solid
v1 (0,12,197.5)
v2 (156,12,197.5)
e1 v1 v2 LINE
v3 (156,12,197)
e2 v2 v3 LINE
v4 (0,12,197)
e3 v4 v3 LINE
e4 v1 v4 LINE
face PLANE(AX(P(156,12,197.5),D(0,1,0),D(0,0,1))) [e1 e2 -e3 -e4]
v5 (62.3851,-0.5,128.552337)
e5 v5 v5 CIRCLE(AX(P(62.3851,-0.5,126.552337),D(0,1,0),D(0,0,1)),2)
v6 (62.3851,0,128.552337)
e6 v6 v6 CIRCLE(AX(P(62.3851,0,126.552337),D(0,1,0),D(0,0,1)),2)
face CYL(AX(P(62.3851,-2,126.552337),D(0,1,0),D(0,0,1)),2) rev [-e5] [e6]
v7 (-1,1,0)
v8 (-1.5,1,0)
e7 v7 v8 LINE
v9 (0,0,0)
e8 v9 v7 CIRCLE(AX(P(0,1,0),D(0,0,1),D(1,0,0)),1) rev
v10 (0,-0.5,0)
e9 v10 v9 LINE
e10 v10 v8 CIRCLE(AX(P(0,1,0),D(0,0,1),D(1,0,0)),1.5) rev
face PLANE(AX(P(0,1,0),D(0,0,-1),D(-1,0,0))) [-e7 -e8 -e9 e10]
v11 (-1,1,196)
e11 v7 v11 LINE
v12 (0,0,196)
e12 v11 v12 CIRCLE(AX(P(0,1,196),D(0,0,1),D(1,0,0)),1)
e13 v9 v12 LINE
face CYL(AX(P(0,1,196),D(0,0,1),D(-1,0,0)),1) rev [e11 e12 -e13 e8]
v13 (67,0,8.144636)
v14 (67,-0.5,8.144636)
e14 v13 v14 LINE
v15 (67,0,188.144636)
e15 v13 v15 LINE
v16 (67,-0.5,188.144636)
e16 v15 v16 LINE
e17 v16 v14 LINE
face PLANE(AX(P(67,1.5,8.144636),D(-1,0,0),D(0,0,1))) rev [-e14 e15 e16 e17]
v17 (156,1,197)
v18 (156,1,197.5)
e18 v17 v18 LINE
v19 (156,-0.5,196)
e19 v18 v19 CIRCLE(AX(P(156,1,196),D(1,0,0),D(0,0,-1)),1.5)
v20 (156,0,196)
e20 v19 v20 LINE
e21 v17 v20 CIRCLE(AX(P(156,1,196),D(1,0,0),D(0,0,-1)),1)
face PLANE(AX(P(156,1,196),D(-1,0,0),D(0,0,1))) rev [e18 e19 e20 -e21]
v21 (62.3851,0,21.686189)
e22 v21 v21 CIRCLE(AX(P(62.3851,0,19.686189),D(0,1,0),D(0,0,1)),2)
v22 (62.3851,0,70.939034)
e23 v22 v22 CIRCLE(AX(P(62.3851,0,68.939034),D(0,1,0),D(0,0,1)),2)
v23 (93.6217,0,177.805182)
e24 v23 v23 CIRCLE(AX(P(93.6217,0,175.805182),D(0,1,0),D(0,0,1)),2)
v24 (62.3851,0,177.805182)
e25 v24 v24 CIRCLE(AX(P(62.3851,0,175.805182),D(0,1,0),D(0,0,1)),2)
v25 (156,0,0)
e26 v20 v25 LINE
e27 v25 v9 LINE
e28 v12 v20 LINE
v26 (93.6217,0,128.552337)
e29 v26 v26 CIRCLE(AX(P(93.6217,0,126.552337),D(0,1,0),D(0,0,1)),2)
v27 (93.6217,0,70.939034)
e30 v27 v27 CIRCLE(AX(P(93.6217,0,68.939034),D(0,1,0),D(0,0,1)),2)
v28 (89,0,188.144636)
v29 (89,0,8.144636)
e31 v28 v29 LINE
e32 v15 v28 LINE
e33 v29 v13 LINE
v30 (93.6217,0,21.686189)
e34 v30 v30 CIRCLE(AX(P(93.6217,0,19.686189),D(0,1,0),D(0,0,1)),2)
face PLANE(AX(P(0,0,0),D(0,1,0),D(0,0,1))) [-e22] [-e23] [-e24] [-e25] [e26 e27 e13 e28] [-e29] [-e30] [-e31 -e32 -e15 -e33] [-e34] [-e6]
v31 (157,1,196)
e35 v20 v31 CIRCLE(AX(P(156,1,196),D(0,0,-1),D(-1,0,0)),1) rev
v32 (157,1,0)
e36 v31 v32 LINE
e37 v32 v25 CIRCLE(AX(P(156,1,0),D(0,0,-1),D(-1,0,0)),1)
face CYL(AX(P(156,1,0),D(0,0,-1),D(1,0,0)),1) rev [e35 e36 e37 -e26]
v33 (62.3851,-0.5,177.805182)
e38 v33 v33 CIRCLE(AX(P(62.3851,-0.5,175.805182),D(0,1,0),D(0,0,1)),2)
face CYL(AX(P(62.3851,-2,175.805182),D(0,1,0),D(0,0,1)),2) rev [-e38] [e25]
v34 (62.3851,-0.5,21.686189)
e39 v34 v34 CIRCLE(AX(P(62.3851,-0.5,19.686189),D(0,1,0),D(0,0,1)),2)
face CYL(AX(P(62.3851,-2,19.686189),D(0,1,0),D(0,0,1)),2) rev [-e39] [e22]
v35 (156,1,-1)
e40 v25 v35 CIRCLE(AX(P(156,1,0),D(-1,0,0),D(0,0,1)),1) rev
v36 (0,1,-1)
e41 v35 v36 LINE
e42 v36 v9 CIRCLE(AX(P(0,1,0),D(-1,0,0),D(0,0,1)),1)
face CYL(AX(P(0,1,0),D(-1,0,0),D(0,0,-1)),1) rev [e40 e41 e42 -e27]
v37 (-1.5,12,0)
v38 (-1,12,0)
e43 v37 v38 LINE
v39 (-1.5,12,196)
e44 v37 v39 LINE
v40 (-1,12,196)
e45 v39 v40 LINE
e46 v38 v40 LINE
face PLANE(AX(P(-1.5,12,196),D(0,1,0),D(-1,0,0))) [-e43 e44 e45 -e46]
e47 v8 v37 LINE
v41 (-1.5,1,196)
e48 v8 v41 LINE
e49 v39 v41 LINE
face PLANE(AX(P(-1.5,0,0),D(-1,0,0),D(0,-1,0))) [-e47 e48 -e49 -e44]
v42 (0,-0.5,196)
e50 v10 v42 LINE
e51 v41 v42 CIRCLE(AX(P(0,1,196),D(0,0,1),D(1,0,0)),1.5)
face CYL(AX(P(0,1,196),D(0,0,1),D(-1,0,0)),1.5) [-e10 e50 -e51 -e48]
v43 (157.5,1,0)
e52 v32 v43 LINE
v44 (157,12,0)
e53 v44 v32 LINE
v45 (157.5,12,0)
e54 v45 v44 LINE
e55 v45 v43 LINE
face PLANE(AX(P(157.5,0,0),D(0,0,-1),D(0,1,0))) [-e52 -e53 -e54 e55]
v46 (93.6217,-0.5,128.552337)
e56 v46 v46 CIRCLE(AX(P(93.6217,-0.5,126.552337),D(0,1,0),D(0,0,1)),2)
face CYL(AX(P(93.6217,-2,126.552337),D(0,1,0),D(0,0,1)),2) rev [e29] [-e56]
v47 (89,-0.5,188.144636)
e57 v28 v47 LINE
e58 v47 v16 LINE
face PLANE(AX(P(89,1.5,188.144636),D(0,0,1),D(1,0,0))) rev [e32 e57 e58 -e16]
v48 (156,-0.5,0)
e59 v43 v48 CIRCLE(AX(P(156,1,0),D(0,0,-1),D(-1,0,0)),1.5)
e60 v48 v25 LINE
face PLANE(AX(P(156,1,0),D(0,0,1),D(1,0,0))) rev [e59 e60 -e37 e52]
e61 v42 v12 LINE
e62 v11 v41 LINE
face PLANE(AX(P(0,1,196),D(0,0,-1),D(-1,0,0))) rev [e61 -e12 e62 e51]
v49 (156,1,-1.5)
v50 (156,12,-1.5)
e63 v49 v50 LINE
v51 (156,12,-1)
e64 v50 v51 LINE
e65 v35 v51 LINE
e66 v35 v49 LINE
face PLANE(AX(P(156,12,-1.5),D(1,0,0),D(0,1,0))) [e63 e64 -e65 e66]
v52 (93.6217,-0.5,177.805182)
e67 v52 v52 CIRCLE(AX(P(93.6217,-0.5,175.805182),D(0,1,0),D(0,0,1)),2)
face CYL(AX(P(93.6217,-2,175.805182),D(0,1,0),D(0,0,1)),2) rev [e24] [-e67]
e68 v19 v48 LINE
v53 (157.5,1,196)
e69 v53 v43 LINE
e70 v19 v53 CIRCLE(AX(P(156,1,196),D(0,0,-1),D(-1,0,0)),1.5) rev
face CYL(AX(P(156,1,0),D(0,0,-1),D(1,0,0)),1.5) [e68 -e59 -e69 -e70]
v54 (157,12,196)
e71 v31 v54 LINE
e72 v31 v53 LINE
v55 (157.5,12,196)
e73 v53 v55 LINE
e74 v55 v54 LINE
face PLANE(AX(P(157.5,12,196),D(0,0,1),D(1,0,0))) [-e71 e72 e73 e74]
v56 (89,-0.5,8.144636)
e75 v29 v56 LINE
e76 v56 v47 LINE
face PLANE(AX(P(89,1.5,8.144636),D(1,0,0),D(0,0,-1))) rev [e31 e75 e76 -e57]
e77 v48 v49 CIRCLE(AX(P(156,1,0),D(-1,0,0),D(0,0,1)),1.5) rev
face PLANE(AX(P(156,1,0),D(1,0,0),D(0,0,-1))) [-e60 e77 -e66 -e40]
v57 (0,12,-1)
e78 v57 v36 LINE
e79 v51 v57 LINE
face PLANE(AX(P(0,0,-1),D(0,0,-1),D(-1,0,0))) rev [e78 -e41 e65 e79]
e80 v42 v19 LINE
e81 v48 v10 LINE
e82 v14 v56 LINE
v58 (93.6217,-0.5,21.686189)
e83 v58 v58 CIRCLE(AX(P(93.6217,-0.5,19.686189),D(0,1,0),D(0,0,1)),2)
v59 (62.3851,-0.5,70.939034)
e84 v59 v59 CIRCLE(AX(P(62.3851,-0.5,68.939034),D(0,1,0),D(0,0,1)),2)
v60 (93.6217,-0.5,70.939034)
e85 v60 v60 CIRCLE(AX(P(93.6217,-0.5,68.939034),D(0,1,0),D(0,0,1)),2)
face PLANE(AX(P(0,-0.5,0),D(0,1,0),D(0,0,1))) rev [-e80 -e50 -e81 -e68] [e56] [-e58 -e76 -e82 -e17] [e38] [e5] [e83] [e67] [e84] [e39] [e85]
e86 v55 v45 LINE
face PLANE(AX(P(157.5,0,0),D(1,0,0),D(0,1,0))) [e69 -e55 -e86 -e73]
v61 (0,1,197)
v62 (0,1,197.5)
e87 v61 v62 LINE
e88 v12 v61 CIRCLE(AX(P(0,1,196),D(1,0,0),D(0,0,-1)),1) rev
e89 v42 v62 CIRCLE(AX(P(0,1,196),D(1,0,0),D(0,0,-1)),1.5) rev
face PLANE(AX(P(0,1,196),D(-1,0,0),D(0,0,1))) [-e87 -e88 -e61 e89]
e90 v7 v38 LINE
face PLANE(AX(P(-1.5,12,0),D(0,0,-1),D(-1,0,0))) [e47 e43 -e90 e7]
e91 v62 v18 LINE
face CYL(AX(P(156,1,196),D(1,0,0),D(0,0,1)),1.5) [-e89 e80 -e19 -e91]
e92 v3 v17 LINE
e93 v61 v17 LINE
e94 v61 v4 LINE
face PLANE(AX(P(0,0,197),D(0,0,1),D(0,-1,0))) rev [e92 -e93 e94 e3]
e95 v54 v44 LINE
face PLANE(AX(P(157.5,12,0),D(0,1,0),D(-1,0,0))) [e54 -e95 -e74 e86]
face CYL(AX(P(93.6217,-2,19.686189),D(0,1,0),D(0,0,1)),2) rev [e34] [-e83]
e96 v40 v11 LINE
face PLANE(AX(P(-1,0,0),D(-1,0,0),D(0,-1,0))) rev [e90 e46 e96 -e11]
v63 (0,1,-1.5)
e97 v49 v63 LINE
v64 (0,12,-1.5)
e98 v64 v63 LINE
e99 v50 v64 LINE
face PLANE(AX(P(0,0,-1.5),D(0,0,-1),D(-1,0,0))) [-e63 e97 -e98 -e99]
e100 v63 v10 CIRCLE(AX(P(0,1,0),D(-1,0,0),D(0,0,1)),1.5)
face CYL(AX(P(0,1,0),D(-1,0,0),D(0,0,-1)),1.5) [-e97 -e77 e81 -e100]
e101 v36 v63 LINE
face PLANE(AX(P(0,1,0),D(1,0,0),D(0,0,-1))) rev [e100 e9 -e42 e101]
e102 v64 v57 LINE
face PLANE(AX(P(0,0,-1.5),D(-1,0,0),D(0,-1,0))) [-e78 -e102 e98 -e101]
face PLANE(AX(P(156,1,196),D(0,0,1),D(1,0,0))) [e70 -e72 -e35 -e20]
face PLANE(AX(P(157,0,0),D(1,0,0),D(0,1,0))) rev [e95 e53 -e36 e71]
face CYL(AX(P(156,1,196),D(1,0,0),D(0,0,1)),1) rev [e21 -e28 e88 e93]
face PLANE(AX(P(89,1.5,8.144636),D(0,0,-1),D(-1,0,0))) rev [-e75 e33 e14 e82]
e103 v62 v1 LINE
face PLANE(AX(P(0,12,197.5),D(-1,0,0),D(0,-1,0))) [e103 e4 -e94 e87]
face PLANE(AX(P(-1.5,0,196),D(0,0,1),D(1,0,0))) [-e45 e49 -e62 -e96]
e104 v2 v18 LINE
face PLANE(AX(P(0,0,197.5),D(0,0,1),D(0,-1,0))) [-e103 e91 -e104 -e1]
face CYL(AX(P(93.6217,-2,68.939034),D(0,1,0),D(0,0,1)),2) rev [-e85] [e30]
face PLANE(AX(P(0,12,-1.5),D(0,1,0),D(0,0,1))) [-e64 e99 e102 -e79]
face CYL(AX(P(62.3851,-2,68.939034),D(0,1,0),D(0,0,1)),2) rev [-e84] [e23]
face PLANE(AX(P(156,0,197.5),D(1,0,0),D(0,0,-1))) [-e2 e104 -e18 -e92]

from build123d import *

# Parameters (mm, degrees)
SKETCH1_W          = 156
SKETCH1_H          = 196
BASE_FLANGE1_DEPTH = 0.5
EDGE_FLANGE1_DEPTH = 196
EDGE_FLANGE2_DEPTH = 156
EDGE_FLANGE3_DEPTH = 196
EDGE_FLANGE4_DEPTH = 156
SKETCH14_W         = 22
SKETCH14_H         = 180
CUT_EXTRUDE1_DEPTH = 2
SKETCH15_R         = 2
CUT_EXTRUDE2_DEPTH = 2


# Sheet-metal steps are written as plain solids
with BuildPart() as part:
    # Sketch1 → Base-Flange1 (new body)
    with BuildSketch(Plane(origin=(0, 0, 0), x_dir=(1, 0, 0), z_dir=(0, 1, 0))):
        with Locations((78, -98)):
            Rectangle(SKETCH1_W, SKETCH1_H)
    extrude(amount=-BASE_FLANGE1_DEPTH)

    # Edge-Flange1 section (across the edge) → Edge-Flange1 (add)
    with BuildSketch(Plane(origin=(-1, 0, 0), x_dir=(1, 0, 0), z_dir=(0, 0, 1))):
        with BuildLine():
            Line((-0.5, 1), (-0.5, 12))
            Line((-0.5, 12), (0, 12))
            Line((0, 12), (0, 1))
            ThreePointArc((0, 1), (0.292893219, 0.292893219), (1, 0))
            Line((1, 0), (1, -0.5))
            ThreePointArc((1, -0.5), (-0.060660172, -0.060660172), (-0.5, 1))
        make_face()
    extrude(amount=EDGE_FLANGE1_DEPTH)

    # Edge-Flange2 section (across the edge) → Edge-Flange2 (add)
    with BuildSketch(Plane(origin=(0, 0, 197), x_dir=(0, 0, -1), z_dir=(1, 0, 0))):
        with BuildLine():
            Line((-0.5, 1), (-0.5, 12))
            Line((-0.5, 12), (0, 12))
            Line((0, 12), (0, 1))
            ThreePointArc((0, 1), (0.292893219, 0.292893219), (1, 0))
            Line((1, 0), (1, -0.5))
            ThreePointArc((1, -0.5), (-0.060660172, -0.060660172), (-0.5, 1))
        make_face()
    extrude(amount=EDGE_FLANGE2_DEPTH)

    # Edge-Flange3 section (across the edge) → Edge-Flange3 (add)
    with BuildSketch(Plane(origin=(157, 0, 196), x_dir=(-1, 0, 0), z_dir=(0, 0, -1))):
        with BuildLine():
            Line((-0.5, 1), (-0.5, 12))
            Line((-0.5, 12), (0, 12))
            Line((0, 12), (0, 1))
            ThreePointArc((0, 1), (0.292893219, 0.292893219), (1, 0))
            Line((1, 0), (1, -0.5))
            ThreePointArc((1, -0.5), (-0.060660172, -0.060660172), (-0.5, 1))
        make_face()
    extrude(amount=EDGE_FLANGE3_DEPTH)

    # Edge-Flange4 section (across the edge) → Edge-Flange4 (add)
    with BuildSketch(Plane(origin=(156, 0, -1), x_dir=(0, 0, 1), z_dir=(-1, 0, 0))):
        with BuildLine():
            Line((-0.5, 1), (-0.5, 12))
            Line((-0.5, 12), (0, 12))
            Line((0, 12), (0, 1))
            ThreePointArc((0, 1), (0.292893219, 0.292893219), (1, 0))
            Line((1, 0), (1, -0.5))
            ThreePointArc((1, -0.5), (-0.060660172, -0.060660172), (-0.5, 1))
        make_face()
    extrude(amount=EDGE_FLANGE4_DEPTH)

    # Sketch14 → Cut-Extrude1 (cut)
    with BuildSketch(Plane.XZ.offset(0.5)):
        with Locations((78, 98.144635834)):
            Rectangle(SKETCH14_W, SKETCH14_H)
    extrude(amount=-CUT_EXTRUDE1_DEPTH, mode=Mode.SUBTRACT)

    # Sketch15 → Cut-Extrude2 (cut)
    with BuildSketch(Plane(origin=(0, 0, 0), x_dir=(1, 0, 0), z_dir=(0, 1, 0))):
        with Locations(Location((93.6217, -175.805181717, 0), (0, 0, 270))):
            Circle(SKETCH15_R)
        with Locations(Location((62.3851, -175.805181717, 0), (0, 0, 270))):
            Circle(SKETCH15_R)
        with Locations(Location((93.6217, -126.552336837, 0), (0, 0, 270))):
            Circle(SKETCH15_R)
        with Locations(Location((62.3851, -126.552336837, 0), (0, 0, 270))):
            Circle(SKETCH15_R)
        with Locations(Location((93.6217, -68.939033602, 0), (0, 0, 270))):
            Circle(SKETCH15_R)
        with Locations(Location((62.3851, -68.939033602, 0), (0, 0, 270))):
            Circle(SKETCH15_R)
        with Locations(Location((93.6217, -19.686188722, 0), (0, 0, 270))):
            Circle(SKETCH15_R)
        with Locations(Location((62.3851, -19.686188722, 0), (0, 0, 270))):
            Circle(SKETCH15_R)
    extrude(amount=-CUT_EXTRUDE2_DEPTH, mode=Mode.SUBTRACT)


solid = part.part
